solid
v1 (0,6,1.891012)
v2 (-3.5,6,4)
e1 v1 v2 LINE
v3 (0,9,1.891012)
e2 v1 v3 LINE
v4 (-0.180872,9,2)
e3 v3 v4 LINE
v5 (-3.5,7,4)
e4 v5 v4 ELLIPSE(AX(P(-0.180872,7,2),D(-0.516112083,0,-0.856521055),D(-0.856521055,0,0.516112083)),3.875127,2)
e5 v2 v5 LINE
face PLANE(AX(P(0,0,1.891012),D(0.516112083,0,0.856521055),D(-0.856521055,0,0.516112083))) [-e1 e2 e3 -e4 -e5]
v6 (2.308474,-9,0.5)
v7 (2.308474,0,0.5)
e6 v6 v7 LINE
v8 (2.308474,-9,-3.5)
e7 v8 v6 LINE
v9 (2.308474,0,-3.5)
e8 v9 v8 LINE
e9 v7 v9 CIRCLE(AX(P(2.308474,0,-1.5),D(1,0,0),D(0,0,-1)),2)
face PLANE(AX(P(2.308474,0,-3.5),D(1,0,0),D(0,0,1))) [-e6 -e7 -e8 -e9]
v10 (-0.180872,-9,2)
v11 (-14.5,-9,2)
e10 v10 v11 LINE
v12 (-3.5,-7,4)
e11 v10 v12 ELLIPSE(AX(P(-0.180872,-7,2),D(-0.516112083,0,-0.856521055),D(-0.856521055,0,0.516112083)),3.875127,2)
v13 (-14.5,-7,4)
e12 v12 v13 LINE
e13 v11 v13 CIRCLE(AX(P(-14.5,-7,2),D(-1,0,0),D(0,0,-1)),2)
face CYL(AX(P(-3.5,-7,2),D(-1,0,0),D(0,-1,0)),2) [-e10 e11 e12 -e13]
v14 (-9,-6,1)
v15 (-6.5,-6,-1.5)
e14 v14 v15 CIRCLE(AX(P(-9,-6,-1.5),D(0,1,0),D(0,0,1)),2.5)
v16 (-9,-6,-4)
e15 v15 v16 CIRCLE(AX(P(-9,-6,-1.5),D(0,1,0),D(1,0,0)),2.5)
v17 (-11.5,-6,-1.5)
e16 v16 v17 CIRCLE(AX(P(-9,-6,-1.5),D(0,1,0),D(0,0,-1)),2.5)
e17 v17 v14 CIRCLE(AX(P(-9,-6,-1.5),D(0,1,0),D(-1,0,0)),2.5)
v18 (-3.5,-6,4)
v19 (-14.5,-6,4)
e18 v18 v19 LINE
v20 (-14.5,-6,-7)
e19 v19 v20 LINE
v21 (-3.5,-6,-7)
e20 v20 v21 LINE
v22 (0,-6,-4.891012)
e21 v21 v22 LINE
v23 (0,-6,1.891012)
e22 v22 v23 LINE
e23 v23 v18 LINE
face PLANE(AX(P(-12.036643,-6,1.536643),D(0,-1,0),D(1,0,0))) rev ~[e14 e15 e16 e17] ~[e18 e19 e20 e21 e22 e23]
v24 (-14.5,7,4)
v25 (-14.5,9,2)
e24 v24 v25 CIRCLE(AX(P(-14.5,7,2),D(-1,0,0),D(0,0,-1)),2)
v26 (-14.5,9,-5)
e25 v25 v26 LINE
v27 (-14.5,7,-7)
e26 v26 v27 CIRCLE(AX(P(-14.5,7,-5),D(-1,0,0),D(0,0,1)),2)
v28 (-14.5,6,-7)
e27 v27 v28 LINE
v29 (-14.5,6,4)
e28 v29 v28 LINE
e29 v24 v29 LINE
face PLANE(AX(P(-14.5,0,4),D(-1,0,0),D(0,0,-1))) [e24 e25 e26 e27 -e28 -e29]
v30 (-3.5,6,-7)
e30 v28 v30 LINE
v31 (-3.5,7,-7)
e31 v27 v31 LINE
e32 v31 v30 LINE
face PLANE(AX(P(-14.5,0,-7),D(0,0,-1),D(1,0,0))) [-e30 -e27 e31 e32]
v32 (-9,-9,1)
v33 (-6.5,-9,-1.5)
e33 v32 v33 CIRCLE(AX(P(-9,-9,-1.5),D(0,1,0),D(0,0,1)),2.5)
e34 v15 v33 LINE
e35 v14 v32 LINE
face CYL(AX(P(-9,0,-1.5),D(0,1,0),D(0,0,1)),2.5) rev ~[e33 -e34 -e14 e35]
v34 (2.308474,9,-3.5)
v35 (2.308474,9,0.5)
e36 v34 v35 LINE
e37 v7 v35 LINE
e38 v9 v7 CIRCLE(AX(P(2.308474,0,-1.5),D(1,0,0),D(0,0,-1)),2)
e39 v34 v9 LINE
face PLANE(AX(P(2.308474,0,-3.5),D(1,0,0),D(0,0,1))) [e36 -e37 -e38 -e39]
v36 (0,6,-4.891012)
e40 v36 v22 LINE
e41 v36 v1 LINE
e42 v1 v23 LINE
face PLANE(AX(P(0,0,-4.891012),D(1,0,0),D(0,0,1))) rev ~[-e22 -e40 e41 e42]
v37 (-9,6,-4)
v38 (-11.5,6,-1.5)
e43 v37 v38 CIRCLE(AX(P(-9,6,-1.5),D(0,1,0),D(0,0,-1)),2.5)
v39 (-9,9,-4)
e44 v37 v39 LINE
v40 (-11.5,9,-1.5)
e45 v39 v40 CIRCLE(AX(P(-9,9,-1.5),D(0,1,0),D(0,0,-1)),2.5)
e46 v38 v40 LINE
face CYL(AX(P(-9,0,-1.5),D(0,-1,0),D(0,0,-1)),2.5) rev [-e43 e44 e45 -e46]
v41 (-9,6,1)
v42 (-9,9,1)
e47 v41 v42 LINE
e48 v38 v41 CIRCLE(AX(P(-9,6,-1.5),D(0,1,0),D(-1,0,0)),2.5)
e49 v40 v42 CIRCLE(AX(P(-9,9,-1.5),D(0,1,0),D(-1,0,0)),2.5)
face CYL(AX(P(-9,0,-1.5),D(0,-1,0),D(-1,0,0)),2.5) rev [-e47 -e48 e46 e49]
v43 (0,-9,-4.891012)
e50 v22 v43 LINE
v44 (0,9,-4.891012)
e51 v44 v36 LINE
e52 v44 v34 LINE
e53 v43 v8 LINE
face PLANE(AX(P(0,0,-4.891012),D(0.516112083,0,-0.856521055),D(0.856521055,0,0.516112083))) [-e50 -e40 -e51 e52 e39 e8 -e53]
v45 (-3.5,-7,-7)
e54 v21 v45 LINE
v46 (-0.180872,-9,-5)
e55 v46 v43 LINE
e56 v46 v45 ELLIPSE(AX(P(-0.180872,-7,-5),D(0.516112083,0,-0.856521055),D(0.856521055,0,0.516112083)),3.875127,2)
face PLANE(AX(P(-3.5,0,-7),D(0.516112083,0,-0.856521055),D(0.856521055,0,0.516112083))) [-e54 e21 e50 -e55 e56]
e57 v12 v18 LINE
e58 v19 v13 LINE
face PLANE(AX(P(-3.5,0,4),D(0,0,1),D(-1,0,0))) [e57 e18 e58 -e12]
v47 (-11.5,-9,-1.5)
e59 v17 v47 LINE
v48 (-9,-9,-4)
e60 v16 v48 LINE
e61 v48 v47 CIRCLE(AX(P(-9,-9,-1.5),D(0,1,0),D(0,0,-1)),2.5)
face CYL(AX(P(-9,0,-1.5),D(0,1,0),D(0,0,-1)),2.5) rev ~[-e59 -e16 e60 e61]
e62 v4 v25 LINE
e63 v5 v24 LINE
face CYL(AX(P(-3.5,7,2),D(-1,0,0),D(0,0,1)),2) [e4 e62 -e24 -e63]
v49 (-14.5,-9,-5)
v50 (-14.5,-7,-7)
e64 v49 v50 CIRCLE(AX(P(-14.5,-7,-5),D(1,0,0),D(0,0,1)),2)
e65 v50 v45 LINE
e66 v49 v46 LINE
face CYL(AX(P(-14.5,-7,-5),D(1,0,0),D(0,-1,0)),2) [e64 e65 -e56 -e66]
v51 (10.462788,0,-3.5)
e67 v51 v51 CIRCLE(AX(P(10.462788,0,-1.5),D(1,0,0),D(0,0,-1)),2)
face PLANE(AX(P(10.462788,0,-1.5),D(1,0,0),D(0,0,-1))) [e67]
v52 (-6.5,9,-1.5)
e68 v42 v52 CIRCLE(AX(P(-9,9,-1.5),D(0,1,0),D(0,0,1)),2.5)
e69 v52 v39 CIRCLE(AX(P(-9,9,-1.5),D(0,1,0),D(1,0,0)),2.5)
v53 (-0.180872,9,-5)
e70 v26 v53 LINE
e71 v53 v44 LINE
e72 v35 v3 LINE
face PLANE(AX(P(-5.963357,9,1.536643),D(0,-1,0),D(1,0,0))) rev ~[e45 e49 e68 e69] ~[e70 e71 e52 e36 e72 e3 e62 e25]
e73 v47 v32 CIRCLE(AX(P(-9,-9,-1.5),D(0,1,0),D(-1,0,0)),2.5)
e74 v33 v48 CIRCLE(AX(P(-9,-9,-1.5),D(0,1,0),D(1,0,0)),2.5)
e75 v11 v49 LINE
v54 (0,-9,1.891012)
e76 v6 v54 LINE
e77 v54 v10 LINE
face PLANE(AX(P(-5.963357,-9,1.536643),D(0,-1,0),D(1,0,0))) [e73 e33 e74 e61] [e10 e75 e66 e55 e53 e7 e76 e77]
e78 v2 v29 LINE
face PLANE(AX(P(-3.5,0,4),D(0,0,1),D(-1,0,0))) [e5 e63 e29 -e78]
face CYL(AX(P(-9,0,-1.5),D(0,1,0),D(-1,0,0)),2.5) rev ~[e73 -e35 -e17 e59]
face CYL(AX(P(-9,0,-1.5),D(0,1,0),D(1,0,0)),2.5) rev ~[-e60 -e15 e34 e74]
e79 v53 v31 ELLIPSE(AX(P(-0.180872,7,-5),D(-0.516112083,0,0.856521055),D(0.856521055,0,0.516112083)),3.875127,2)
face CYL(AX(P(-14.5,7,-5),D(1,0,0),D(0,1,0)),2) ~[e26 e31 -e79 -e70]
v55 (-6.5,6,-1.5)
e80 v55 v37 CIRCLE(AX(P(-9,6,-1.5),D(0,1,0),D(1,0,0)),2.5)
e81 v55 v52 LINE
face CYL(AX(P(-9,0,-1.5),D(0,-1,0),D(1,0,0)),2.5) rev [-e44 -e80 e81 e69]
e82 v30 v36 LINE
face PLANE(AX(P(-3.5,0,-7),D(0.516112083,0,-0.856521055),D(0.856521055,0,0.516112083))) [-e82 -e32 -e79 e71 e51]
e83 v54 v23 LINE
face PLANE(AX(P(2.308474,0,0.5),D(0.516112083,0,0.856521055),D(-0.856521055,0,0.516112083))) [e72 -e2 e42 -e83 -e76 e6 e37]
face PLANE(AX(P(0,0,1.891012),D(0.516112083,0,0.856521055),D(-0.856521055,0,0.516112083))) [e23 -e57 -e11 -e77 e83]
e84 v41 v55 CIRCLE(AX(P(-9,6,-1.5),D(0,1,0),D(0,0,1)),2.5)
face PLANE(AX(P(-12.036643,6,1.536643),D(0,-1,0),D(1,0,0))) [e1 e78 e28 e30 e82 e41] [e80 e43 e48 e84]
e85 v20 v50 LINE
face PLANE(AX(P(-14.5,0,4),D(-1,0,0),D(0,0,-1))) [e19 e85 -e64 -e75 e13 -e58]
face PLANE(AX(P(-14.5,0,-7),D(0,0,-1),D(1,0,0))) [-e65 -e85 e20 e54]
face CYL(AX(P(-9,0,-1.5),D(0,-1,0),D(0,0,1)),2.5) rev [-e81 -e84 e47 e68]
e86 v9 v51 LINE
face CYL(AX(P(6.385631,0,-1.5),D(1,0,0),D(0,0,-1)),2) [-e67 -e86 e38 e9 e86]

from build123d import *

# Parameters (mm, degrees)
F3_W     = 8.1543137785
F3_H     = 2
F5_DEPTH = 9
F6_DEPTH = 6
F8_R     = 2


# Not quite as in the source:
# - a feature names something its author has since deleted; it is built from what else it names


with BuildPart() as f4:
    # F3 (on Front) → F4 (revolve)
    with BuildSketch(Plane.XZ):
        with Locations((6.3856310444, -2.5)):
            Rectangle(F3_W, F3_H)
    revolve(axis=Axis((6.3856310444, 0, -1.5), (1, 0, 0)))

    # F3 (on Front) → F5 (join, symmetric)
    with BuildSketch(Plane.XZ):
        with BuildLine():
            ThreePointArc((-9, 1), (-7.232233047, 0.267766953), (-6.5, -1.5))
            Line((-6.5, -1.5), (-3.5, -1.5))
            Line((-3.5, -1.5), (-3.5, 4))
            Line((-3.5, 4), (-9, 4))
            Line((-9, 4), (-9, 1))
        make_face()
        with BuildLine():
            Line((-3.5, -1.5), (-6.5, -1.5))
            ThreePointArc((-6.5, -1.5), (-7.232233047, -3.267766953), (-9, -4))
            Line((-9, -4), (-9, -7))
            Line((-9, -7), (-3.5, -7))
            Line((-3.5, -7), (-3.5, -1.5))
        make_face()
        with BuildLine():
            Line((-9, -7), (-9, -4))
            ThreePointArc((-9, -4), (-10.767766953, -3.267766953), (-11.5, -1.5))
            Line((-11.5, -1.5), (-14.5, -1.5))
            Line((-14.5, -1.5), (-14.5, -7))
            Line((-14.5, -7), (-9, -7))
        make_face()
        with BuildLine():
            ThreePointArc((-11.5, -1.5), (-10.767766953, 0.267766953), (-9, 1))
            Line((-9, 1), (-9, 4))
            Line((-9, 4), (-14.5, 4))
            Line((-14.5, 4), (-14.5, -1.5))
            Line((-14.5, -1.5), (-11.5, -1.5))
        make_face()
        Polygon((0, 1.8910123945), (0, -1.5), (2.3084741551, -1.5), (2.3084741551, 0.5), align=None)
        Polygon((2.3084741551, -1.5), (0, -1.5), (0, -4.8910123945), (2.3084741551, -3.5), align=None)
        Polygon((-3.5, 4), (-3.5, -1.5), (0, -1.5), (0, 1.8910123945), align=None)
        Polygon((0, -1.5), (-3.5, -1.5), (-3.5, -7), (0, -4.8910123945), align=None)
    extrude(amount=F5_DEPTH, both=True)


with BuildPart() as f6:
    # F3 (on Front) → F6 (new body, symmetric)
    with BuildSketch(Plane.XZ):
        with BuildLine():
            ThreePointArc((-11.5, -1.5), (-10.767766953, 0.267766953), (-9, 1))
            Line((-9, 1), (-9, 4))
            Line((-9, 4), (-14.5, 4))
            Line((-14.5, 4), (-14.5, -1.5))
            Line((-14.5, -1.5), (-11.5, -1.5))
        make_face()
        with BuildLine():
            ThreePointArc((-9, 1), (-7.232233047, 0.267766953), (-6.5, -1.5))
            Line((-6.5, -1.5), (-3.5, -1.5))
            Line((-3.5, -1.5), (-3.5, 4))
            Line((-3.5, 4), (-9, 4))
            Line((-9, 4), (-9, 1))
        make_face()
        with BuildLine():
            Line((-3.5, -1.5), (-6.5, -1.5))
            ThreePointArc((-6.5, -1.5), (-7.232233047, -3.267766953), (-9, -4))
            Line((-9, -4), (-9, -7))
            Line((-9, -7), (-3.5, -7))
            Line((-3.5, -7), (-3.5, -1.5))
        make_face()
        with BuildLine():
            Line((-9, -7), (-9, -4))
            ThreePointArc((-9, -4), (-10.767766953, -3.267766953), (-11.5, -1.5))
            Line((-11.5, -1.5), (-14.5, -1.5))
            Line((-14.5, -1.5), (-14.5, -7))
            Line((-14.5, -7), (-9, -7))
        make_face()
        Polygon((-3.5, 4), (-3.5, -1.5), (0, -1.5), (0, 1.8910123945), align=None)
        Polygon((0, -1.5), (-3.5, -1.5), (-3.5, -7), (0, -4.8910123945), align=None)
    extrude(amount=F6_DEPTH, both=True)


with BuildPart() as f4_1:
    add(f4.part)

    # F7: cut F6
    add(f6.part, mode=Mode.SUBTRACT)

    # F8
    f8_edges = [f4_1.edges().sort_by_distance(p)[0] for p in [
        (-9, -9, 4),
        (-9, -9, -7),
        (-9, 9, -7),
        (-9, 9, 4),
    ]]
    fillet(f8_edges, radius=F8_R)


solid = f4_1.part
